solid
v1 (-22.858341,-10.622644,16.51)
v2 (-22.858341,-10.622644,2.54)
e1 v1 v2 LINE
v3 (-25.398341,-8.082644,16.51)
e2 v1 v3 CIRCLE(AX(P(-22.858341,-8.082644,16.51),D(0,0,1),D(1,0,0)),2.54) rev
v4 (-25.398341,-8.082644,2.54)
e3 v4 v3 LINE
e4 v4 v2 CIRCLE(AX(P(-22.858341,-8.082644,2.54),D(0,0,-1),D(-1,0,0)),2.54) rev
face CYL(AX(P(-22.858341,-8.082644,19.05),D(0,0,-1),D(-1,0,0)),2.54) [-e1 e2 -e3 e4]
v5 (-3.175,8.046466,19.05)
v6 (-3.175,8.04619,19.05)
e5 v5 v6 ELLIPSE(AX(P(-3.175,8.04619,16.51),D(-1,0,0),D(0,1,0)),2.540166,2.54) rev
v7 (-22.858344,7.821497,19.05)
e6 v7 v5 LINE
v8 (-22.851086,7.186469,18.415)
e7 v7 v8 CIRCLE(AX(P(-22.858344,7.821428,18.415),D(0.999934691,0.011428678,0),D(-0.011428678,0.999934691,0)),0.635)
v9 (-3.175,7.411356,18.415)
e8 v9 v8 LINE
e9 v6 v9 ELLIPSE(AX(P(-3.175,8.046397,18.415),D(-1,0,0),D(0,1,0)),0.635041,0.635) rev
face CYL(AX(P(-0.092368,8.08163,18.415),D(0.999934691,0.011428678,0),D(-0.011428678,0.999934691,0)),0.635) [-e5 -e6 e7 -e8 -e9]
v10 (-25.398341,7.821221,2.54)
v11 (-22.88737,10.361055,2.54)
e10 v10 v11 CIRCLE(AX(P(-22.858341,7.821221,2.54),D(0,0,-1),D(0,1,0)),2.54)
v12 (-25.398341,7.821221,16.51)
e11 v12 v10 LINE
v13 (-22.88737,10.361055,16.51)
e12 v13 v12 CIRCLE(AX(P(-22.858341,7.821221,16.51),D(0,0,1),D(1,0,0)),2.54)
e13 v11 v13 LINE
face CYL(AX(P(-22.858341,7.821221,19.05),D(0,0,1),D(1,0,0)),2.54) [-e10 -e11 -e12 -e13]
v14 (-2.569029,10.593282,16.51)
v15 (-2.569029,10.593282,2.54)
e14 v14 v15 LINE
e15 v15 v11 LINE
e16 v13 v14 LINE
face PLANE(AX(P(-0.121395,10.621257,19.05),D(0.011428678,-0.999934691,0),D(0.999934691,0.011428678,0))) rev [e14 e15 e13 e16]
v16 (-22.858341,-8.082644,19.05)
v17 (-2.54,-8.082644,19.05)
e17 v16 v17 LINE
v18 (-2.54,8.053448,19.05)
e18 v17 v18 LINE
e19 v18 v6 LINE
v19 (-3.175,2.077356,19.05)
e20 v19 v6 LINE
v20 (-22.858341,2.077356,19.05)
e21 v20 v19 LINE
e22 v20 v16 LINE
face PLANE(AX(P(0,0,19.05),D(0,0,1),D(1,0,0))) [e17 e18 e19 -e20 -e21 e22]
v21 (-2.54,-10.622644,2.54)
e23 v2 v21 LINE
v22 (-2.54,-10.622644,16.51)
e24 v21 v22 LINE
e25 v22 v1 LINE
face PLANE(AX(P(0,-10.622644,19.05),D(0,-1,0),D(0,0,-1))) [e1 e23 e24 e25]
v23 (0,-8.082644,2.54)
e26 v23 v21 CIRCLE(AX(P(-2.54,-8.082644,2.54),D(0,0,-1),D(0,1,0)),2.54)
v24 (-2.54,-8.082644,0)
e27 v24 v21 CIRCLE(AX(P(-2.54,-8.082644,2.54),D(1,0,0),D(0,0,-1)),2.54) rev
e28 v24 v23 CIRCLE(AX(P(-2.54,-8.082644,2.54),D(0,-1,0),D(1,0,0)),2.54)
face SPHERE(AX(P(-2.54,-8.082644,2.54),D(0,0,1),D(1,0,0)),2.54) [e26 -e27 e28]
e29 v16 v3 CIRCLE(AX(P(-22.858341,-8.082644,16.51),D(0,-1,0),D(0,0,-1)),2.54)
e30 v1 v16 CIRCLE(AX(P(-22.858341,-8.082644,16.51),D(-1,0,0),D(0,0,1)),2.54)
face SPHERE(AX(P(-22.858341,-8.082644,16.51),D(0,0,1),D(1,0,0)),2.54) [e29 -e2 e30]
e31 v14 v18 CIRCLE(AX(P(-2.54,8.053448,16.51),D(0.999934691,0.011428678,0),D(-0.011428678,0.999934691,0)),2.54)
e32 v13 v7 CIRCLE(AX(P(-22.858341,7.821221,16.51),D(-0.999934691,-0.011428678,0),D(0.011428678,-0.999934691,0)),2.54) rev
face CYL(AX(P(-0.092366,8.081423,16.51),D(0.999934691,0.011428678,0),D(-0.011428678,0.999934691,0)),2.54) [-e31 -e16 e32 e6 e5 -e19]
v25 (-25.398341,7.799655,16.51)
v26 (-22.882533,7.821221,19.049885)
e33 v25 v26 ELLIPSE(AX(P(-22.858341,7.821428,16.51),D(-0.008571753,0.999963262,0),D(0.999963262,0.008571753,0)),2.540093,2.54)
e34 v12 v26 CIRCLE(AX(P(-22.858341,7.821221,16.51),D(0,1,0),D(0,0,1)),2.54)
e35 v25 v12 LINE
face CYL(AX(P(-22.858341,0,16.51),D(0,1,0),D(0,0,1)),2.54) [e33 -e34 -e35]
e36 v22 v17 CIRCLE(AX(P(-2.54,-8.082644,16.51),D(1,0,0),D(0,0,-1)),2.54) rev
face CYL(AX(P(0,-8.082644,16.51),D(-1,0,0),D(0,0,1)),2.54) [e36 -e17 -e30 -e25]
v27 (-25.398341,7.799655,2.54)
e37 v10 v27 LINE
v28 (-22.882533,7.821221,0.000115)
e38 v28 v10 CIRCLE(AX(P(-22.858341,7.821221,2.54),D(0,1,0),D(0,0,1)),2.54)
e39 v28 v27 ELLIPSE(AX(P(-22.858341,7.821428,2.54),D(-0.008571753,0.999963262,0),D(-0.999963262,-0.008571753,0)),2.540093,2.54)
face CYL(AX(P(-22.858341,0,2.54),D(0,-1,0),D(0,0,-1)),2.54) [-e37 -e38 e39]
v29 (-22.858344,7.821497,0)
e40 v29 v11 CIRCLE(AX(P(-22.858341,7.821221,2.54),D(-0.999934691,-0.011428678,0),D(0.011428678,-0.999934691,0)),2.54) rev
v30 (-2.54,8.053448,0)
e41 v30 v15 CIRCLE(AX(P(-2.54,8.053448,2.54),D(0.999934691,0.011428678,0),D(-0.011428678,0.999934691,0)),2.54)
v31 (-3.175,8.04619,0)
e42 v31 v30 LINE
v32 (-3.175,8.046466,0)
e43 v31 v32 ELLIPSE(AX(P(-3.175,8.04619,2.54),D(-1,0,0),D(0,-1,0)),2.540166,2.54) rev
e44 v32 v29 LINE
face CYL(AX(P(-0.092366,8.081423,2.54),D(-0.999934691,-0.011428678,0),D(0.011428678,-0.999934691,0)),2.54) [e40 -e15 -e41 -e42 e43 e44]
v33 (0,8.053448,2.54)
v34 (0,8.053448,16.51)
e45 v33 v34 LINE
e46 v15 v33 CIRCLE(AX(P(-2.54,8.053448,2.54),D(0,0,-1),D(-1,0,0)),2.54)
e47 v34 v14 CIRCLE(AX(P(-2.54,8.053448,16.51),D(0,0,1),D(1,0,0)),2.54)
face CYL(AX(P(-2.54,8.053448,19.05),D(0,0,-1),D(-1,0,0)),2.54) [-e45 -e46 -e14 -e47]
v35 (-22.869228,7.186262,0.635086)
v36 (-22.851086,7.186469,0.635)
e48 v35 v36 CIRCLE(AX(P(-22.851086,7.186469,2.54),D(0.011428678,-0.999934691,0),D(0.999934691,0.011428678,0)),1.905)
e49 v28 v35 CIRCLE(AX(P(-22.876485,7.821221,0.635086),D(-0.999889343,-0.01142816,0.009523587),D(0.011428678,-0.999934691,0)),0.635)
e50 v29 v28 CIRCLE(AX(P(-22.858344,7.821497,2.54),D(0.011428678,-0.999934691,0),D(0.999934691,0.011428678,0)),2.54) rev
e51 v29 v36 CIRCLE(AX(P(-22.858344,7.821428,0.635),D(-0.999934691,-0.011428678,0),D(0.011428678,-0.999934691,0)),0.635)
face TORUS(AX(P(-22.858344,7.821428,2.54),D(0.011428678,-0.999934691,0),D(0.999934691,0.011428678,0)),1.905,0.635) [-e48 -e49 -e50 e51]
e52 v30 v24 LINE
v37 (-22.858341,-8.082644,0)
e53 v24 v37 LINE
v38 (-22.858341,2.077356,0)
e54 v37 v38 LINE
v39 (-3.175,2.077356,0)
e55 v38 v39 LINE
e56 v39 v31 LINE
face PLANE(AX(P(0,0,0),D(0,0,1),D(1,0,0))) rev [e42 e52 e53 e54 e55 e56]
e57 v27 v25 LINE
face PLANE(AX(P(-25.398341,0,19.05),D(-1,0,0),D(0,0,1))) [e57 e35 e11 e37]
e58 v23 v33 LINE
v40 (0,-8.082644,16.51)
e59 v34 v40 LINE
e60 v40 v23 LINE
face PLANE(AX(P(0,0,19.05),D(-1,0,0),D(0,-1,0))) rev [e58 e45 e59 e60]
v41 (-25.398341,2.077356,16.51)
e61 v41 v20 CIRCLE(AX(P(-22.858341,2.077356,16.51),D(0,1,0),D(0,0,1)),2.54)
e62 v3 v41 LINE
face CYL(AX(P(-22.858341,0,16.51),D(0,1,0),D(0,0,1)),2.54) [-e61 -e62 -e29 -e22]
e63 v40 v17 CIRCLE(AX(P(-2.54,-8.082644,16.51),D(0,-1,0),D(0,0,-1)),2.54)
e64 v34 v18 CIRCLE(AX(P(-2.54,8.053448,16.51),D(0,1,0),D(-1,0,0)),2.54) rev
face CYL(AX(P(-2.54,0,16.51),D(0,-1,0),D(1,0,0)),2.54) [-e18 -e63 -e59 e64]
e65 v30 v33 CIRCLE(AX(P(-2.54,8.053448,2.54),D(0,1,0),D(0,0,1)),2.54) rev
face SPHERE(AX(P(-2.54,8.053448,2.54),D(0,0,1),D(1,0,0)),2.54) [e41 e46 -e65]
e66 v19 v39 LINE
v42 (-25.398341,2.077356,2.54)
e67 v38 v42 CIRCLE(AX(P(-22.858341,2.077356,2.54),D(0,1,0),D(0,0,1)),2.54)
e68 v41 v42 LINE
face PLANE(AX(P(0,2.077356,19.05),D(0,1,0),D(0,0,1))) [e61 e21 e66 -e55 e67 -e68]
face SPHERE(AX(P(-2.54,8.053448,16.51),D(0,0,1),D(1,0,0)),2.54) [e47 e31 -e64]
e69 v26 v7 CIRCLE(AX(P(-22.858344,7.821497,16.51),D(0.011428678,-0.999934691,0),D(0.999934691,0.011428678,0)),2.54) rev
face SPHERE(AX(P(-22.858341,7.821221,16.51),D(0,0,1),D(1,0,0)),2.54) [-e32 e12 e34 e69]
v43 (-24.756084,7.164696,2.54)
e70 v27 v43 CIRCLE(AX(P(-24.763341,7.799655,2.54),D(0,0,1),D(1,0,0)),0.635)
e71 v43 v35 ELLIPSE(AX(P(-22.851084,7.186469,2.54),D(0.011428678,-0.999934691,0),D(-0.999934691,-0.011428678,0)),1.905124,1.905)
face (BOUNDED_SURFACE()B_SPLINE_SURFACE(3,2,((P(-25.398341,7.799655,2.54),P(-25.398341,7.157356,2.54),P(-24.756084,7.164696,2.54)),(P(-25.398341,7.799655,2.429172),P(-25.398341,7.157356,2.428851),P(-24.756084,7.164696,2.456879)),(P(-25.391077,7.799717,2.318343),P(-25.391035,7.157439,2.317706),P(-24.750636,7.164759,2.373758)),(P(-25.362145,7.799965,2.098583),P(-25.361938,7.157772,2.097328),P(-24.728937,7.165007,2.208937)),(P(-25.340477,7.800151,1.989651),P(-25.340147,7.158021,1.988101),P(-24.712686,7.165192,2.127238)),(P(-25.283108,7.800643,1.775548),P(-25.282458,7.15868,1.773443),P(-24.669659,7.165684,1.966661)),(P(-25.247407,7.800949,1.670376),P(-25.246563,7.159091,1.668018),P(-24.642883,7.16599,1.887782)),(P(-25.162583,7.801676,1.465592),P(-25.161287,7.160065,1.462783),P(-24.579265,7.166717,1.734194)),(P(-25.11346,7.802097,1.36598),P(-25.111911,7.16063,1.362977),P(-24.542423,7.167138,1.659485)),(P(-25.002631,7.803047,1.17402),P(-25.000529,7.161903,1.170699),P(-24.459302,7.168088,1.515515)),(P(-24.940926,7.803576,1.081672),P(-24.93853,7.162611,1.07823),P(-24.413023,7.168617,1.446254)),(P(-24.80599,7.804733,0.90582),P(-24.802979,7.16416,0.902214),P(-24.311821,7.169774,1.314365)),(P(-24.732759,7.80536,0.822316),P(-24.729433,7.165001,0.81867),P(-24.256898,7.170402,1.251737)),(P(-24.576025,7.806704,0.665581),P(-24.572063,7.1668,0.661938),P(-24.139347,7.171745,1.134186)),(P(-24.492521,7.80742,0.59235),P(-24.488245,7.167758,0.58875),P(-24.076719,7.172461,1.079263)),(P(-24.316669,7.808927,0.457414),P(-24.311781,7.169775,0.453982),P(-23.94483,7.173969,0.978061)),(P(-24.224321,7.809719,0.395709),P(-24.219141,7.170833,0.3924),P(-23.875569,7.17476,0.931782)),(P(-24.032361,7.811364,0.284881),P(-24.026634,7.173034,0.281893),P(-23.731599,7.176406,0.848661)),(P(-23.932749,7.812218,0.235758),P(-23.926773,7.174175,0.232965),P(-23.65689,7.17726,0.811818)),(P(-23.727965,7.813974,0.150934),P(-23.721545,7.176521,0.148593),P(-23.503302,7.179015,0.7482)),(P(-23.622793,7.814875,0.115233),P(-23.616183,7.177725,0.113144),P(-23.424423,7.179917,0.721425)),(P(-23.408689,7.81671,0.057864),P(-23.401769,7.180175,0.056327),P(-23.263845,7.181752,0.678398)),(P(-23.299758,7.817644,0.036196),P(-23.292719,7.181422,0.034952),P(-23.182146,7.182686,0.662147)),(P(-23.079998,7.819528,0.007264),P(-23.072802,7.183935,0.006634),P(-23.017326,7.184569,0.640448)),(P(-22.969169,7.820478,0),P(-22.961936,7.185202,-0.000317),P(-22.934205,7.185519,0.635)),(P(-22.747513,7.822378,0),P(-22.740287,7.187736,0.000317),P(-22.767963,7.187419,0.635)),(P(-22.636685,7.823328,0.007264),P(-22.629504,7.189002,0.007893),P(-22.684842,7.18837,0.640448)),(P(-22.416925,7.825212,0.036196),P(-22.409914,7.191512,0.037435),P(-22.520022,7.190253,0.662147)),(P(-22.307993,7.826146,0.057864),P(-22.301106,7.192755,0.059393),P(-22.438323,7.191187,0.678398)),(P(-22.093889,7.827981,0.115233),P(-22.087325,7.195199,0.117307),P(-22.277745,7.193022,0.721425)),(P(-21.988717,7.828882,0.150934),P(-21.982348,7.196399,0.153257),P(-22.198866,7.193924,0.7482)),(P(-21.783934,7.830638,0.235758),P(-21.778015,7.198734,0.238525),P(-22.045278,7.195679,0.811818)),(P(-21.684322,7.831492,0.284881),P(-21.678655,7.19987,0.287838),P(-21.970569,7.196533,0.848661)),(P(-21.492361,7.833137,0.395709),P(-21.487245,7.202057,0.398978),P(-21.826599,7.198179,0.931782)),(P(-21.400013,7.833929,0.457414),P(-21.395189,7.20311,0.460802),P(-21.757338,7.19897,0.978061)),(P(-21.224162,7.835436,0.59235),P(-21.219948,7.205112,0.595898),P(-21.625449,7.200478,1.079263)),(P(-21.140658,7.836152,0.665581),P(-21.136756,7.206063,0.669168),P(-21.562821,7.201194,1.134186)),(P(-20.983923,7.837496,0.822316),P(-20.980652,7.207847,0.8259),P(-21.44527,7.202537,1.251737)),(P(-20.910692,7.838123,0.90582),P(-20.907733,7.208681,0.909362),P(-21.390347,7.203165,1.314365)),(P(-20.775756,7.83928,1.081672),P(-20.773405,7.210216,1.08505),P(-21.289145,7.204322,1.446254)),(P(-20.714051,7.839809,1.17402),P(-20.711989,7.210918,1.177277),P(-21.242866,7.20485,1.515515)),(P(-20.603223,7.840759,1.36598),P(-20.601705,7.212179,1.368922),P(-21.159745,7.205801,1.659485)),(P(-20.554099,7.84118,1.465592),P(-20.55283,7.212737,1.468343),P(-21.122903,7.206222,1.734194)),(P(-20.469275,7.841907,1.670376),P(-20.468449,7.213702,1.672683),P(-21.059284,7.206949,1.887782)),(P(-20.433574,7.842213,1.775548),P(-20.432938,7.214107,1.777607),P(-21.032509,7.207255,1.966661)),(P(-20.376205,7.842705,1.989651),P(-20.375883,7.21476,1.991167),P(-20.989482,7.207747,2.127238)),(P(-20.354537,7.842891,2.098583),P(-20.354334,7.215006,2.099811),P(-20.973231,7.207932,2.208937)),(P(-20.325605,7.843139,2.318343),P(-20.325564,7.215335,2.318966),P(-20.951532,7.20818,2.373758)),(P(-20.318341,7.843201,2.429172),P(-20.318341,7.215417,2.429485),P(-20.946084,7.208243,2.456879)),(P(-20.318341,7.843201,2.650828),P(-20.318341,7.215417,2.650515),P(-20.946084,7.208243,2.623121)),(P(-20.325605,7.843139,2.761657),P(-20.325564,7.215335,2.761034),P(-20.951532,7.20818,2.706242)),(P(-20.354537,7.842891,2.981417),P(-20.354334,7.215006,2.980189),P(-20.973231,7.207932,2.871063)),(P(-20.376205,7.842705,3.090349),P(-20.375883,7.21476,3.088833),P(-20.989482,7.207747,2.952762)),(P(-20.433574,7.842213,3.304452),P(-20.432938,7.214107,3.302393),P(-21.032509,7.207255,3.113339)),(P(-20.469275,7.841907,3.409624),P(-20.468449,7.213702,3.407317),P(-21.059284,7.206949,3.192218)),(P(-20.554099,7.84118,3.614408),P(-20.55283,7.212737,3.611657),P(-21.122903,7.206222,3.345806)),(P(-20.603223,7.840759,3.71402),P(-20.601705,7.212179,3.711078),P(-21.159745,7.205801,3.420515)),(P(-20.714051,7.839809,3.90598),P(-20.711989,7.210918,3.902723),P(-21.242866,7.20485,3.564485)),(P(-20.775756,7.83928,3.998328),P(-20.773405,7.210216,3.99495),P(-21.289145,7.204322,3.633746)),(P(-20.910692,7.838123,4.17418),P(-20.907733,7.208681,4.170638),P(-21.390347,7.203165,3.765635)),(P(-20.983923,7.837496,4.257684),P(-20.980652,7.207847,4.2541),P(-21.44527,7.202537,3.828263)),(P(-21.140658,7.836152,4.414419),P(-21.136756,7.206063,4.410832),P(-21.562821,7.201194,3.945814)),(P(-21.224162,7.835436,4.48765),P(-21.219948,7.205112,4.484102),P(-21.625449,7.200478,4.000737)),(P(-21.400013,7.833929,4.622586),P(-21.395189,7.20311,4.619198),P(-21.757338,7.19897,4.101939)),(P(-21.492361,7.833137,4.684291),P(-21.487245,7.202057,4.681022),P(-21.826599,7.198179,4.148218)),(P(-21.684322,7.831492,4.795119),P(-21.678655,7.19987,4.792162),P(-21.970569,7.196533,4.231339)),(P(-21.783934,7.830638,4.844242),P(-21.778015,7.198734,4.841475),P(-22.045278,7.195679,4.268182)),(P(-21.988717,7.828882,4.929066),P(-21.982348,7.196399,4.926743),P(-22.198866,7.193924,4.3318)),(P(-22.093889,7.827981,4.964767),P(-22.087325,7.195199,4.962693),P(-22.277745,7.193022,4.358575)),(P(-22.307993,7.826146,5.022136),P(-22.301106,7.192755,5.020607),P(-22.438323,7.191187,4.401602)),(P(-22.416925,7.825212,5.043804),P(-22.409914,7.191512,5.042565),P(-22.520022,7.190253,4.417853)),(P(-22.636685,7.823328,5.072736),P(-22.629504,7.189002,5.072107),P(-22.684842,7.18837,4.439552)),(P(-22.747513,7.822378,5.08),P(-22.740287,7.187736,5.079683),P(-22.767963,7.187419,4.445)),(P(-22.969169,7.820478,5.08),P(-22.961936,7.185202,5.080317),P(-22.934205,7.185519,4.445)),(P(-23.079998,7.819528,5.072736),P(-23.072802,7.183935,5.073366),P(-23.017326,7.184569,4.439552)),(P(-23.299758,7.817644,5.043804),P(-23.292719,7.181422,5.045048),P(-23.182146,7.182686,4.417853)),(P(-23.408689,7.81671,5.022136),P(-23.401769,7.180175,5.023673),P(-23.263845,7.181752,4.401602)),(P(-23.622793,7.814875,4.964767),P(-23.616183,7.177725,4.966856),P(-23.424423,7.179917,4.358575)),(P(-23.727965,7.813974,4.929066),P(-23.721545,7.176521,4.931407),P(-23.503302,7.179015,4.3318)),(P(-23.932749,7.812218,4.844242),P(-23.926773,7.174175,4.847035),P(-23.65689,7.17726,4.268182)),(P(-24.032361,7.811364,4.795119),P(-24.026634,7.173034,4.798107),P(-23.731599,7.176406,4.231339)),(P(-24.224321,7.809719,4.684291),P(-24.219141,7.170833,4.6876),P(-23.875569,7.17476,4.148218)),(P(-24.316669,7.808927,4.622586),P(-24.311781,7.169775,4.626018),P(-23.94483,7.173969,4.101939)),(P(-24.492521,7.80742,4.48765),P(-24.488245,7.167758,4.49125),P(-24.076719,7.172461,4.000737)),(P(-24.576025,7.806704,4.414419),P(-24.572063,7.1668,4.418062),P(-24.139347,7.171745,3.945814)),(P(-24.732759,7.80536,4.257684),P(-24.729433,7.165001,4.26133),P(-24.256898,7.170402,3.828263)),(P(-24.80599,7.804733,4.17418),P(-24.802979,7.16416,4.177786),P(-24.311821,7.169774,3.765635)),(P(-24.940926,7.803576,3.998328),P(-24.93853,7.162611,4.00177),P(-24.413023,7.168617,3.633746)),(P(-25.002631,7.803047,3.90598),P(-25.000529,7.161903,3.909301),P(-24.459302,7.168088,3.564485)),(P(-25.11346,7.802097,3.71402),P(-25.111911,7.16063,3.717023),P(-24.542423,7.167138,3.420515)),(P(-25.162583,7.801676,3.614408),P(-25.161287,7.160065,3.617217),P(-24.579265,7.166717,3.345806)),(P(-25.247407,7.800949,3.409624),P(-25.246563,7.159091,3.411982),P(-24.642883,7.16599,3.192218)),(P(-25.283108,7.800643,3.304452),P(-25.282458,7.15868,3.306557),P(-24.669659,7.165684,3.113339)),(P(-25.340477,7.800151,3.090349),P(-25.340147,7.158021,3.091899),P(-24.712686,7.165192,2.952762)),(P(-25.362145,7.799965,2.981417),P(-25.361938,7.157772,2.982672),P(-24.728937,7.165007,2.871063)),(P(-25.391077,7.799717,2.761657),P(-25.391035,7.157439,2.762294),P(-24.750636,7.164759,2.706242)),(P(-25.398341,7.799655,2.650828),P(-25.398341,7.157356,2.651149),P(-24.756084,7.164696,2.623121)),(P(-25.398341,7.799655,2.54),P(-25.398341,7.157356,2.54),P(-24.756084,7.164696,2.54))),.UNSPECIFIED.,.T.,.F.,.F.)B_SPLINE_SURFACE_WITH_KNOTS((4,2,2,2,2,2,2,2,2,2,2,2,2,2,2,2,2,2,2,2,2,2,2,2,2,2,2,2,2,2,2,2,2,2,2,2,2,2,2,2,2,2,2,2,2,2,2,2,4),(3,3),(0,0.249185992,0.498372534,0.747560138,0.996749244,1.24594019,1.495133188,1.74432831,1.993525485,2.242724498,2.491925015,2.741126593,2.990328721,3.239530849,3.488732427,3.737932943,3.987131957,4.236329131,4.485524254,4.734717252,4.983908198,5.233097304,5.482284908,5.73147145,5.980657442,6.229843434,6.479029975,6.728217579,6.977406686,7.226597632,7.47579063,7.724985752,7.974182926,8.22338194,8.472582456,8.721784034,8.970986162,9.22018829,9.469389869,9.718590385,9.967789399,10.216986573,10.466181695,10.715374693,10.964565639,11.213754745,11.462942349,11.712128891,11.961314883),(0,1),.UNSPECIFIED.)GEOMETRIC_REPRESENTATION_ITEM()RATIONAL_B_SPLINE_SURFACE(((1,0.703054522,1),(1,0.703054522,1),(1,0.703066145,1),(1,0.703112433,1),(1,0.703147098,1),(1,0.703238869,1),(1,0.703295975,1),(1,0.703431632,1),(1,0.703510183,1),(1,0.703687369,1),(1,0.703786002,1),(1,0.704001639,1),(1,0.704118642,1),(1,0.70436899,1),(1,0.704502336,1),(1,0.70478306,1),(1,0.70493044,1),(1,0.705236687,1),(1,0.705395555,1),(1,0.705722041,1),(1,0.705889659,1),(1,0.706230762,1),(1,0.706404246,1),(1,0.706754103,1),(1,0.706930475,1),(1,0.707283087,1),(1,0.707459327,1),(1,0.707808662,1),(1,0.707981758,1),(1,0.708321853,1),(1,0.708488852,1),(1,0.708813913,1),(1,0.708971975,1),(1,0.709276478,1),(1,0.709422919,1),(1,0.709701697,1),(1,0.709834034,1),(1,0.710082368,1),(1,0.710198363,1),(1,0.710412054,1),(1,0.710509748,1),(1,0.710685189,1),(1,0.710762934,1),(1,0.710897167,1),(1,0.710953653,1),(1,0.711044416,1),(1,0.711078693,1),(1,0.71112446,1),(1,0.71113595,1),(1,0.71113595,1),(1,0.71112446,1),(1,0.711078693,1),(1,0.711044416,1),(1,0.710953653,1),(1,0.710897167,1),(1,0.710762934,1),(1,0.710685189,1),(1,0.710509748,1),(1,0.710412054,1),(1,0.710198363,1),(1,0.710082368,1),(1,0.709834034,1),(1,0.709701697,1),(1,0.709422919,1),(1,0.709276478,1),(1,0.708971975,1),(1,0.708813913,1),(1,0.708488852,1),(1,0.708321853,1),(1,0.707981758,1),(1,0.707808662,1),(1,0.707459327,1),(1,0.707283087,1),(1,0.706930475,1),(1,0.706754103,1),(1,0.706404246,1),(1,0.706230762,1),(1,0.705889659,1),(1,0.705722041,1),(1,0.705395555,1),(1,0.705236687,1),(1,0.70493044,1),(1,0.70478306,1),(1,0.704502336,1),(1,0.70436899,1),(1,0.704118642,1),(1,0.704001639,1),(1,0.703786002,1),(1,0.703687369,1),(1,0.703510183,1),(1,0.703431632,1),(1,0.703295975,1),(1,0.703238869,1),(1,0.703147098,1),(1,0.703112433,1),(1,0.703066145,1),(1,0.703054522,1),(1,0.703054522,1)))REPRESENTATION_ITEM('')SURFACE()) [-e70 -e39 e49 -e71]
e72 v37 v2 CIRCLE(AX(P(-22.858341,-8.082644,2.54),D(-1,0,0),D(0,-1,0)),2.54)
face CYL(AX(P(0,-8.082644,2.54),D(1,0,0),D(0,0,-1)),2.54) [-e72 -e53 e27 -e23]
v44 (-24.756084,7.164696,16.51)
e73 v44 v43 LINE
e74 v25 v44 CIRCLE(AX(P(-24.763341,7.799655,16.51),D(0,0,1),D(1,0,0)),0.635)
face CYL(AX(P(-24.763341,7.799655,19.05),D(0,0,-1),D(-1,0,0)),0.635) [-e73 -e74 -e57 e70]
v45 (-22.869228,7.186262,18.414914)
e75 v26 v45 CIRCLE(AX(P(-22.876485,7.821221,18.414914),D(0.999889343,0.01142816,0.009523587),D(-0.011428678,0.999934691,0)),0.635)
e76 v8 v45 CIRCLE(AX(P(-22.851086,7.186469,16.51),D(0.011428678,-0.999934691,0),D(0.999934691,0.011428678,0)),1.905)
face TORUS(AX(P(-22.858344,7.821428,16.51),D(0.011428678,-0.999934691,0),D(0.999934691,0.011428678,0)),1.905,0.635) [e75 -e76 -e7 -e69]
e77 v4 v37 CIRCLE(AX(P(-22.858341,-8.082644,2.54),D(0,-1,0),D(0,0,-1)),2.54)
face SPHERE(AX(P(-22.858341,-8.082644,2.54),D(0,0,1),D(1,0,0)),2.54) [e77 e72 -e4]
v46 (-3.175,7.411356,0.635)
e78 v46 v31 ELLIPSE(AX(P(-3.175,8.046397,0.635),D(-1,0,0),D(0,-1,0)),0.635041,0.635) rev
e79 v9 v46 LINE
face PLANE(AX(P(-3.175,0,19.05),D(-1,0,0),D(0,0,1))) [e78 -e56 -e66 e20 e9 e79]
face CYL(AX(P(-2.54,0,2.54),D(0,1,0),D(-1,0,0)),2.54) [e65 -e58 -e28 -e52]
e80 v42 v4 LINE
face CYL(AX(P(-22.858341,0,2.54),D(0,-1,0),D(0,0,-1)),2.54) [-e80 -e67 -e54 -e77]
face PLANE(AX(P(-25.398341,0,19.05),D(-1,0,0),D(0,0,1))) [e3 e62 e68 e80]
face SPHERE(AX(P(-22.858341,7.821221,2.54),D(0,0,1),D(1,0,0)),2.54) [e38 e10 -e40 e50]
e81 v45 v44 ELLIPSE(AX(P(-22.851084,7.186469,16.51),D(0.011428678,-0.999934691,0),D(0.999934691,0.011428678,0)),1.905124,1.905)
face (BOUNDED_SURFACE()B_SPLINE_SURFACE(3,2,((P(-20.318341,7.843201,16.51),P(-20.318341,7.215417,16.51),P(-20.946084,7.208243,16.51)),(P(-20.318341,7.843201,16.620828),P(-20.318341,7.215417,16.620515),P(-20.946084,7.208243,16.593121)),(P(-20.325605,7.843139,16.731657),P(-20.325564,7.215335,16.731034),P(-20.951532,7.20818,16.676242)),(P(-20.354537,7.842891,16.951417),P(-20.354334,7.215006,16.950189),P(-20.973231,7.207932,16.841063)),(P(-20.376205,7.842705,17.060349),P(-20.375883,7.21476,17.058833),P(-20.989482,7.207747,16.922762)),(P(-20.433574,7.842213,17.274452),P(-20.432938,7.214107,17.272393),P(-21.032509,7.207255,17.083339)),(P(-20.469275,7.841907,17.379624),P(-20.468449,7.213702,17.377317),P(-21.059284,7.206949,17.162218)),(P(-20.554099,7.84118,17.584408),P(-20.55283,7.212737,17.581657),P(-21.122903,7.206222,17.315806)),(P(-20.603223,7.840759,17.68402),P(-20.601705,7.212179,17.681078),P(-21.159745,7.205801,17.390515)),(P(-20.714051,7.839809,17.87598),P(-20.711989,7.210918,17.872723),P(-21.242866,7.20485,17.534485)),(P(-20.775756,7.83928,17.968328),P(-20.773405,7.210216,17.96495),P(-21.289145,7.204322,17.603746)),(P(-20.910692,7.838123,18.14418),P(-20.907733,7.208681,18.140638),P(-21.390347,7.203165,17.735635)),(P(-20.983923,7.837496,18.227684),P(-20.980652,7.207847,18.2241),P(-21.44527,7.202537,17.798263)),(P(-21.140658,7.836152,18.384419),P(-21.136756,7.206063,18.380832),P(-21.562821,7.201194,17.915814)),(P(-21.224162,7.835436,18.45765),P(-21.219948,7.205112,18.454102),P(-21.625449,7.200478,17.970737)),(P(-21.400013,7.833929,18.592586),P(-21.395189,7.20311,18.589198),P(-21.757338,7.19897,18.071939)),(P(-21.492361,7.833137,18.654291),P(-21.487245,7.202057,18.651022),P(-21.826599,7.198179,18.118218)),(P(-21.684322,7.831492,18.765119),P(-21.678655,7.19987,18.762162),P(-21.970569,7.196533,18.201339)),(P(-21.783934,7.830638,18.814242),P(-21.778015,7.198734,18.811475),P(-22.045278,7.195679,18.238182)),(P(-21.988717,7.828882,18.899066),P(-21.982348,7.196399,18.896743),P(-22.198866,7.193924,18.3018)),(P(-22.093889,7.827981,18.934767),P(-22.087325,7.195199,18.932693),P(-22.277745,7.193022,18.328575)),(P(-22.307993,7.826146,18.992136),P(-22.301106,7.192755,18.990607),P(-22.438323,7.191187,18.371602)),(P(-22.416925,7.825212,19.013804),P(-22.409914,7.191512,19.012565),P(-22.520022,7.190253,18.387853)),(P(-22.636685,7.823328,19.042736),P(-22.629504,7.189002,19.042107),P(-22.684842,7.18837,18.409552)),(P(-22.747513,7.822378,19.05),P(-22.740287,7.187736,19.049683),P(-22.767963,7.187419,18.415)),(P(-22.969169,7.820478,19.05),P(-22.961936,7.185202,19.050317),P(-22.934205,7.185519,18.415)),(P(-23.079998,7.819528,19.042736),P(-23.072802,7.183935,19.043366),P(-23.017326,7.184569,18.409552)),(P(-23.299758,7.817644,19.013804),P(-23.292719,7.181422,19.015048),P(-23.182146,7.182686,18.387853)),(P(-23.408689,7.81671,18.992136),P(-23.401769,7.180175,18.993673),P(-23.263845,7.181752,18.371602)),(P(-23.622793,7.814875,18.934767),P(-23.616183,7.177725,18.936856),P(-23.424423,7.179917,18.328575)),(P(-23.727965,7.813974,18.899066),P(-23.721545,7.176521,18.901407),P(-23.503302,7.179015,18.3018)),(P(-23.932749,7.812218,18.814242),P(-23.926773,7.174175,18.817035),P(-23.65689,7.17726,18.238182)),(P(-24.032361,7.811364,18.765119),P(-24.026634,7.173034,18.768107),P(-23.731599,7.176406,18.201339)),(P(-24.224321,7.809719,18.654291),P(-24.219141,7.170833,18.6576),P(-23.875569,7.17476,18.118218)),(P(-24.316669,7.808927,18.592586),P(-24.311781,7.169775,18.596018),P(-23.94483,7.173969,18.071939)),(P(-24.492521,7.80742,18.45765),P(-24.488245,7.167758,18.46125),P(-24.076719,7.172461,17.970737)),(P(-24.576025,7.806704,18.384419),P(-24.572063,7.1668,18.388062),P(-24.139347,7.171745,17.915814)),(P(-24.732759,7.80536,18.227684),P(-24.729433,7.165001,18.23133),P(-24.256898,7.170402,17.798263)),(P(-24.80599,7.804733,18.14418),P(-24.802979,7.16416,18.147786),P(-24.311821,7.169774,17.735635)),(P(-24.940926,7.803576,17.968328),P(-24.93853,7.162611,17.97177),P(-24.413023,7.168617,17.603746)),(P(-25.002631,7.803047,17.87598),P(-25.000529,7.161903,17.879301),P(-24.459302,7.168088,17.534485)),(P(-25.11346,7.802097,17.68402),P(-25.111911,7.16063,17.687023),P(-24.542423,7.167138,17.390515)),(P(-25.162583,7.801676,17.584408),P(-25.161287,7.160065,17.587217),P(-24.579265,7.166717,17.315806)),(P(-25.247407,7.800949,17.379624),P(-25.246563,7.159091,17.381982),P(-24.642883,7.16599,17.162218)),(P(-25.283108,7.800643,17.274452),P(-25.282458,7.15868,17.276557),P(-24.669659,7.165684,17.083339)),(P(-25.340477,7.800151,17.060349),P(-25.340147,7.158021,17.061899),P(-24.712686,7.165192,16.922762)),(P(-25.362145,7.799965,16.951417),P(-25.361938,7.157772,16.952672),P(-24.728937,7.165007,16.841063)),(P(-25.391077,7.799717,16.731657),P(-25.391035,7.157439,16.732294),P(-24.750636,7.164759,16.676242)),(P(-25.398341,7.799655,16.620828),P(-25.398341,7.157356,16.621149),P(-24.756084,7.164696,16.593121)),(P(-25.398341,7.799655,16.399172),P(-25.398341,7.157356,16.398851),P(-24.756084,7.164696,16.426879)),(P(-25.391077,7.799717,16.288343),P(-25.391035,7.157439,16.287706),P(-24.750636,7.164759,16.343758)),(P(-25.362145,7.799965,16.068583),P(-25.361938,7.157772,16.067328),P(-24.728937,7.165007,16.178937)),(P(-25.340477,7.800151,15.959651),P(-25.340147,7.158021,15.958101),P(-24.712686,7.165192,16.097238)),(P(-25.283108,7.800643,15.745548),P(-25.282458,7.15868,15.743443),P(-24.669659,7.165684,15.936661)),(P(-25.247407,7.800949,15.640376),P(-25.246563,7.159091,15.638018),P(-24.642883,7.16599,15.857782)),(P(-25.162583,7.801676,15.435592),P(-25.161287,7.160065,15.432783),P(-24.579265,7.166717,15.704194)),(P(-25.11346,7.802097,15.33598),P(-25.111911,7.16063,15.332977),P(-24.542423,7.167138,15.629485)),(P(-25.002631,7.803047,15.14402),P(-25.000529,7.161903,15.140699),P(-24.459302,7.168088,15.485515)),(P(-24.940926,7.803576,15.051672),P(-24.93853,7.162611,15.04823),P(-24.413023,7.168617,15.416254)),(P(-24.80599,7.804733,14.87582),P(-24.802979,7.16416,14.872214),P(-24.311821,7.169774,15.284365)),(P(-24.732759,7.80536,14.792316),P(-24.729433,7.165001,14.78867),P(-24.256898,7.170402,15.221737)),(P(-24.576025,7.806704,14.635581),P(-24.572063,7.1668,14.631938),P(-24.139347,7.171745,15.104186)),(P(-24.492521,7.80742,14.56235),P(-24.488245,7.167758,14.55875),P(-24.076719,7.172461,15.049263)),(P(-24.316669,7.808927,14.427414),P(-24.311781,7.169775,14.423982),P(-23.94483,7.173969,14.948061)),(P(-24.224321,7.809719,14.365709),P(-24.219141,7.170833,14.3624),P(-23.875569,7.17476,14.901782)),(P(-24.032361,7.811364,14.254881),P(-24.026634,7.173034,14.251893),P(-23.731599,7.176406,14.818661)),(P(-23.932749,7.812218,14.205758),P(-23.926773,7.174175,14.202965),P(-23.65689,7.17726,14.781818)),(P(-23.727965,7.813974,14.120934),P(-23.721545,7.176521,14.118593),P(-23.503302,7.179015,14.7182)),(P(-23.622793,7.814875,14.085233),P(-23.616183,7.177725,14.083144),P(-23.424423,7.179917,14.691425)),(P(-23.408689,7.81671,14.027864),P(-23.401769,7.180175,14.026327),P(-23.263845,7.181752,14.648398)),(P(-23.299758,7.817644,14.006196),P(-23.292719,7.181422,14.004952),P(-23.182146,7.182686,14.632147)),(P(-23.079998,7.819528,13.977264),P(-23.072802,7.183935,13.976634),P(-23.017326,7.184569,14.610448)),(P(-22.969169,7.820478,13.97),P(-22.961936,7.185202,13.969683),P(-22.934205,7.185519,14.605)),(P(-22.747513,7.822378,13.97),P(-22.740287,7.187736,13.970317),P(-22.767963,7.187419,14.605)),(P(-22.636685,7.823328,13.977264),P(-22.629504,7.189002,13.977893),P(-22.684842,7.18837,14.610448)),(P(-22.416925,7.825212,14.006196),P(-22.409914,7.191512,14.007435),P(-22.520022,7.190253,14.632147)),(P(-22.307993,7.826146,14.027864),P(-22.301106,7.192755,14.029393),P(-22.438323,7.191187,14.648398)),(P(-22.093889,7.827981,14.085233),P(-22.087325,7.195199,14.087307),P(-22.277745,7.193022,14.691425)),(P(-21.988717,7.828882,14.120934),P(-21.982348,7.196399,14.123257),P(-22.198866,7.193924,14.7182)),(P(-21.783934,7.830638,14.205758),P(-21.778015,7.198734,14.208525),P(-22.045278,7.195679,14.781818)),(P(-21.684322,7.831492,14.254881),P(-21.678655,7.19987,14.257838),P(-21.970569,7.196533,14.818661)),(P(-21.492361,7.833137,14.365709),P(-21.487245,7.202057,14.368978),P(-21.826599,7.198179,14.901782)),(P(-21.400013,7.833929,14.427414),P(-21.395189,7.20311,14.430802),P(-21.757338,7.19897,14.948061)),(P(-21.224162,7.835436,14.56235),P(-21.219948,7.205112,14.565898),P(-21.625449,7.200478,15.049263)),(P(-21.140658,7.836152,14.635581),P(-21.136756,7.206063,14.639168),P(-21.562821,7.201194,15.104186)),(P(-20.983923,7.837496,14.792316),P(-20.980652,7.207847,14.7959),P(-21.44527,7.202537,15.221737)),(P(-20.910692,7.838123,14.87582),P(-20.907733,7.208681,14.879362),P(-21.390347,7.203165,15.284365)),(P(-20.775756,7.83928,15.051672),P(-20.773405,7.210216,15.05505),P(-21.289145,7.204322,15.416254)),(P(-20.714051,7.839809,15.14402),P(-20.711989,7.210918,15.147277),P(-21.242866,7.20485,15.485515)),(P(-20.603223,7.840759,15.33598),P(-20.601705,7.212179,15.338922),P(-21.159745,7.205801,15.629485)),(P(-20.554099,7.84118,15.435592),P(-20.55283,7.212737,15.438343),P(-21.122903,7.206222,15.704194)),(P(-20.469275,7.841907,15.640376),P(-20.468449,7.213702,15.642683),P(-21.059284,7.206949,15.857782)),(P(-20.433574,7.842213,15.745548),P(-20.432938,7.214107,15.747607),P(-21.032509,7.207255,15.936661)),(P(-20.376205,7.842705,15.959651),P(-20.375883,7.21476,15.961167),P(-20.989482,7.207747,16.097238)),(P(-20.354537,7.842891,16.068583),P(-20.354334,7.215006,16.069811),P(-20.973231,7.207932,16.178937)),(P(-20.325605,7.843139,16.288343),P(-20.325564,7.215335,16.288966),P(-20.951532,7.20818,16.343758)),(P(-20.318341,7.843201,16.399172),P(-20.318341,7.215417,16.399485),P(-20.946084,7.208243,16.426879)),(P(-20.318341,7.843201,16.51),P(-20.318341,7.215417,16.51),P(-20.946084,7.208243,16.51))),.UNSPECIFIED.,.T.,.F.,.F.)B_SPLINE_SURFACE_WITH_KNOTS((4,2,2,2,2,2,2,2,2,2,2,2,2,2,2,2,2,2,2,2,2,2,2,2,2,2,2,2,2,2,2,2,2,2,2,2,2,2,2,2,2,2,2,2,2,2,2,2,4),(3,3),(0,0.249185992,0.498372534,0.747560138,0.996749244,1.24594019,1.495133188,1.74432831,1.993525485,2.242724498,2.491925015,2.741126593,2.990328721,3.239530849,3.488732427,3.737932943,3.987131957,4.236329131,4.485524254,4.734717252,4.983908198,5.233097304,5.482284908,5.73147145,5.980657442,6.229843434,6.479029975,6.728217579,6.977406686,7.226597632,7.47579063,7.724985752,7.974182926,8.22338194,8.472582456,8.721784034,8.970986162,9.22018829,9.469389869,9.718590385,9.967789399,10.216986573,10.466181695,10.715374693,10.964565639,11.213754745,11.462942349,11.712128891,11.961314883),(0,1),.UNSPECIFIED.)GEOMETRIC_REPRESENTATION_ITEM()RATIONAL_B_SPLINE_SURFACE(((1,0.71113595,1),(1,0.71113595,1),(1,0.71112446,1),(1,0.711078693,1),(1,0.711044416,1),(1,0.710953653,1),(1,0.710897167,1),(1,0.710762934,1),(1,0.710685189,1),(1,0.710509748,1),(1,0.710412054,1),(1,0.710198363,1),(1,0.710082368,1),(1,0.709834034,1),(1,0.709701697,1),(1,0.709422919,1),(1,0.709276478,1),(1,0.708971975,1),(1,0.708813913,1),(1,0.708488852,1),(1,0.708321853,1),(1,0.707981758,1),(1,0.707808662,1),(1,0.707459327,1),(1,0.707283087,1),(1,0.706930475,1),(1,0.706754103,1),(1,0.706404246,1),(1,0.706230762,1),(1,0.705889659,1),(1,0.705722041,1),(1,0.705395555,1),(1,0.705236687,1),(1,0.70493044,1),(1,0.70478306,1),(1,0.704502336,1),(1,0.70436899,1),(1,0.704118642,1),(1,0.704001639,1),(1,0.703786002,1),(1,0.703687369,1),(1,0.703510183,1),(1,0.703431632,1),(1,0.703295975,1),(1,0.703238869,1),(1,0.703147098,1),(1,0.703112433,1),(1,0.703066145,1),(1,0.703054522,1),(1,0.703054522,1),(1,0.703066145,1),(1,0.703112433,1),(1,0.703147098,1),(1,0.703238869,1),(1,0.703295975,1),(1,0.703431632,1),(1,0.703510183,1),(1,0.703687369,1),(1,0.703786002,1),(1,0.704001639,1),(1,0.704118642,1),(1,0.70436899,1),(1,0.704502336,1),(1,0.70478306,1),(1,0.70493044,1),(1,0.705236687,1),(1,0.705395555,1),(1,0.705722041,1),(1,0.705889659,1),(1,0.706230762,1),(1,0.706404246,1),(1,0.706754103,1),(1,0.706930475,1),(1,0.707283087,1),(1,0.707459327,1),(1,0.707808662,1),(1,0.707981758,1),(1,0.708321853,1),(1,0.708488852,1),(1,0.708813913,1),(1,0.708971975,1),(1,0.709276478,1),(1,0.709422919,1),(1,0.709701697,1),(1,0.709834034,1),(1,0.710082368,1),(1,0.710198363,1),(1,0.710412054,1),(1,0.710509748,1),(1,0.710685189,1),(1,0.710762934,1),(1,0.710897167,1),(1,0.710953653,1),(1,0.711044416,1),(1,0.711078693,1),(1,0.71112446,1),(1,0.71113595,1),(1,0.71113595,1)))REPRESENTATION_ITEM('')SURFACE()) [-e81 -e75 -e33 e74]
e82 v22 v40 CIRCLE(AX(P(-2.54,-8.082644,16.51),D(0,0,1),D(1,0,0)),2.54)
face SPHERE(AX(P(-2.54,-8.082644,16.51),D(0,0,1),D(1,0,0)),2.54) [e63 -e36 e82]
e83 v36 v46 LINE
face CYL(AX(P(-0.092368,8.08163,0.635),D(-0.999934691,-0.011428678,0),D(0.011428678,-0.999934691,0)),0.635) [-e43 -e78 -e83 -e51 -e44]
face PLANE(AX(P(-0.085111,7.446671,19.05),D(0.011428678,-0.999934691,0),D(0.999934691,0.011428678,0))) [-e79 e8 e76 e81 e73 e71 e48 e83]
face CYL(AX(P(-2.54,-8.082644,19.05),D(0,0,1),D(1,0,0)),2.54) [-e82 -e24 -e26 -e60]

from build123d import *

# Parameters (mm, degrees)
BOSS_EXTRUDE1_DEPTH = 19.05
FILLET1_R           = 2.54
FILLET2_R           = 0.635


with BuildPart() as part:
    # Sketch1 → Boss-Extrude1 (new body)
    with BuildSketch(Plane.XY):
        Polygon((-25.398341139, -10.622644211), (0, -10.622644211), (0, 10.622644211), (-25.398341139, 10.332355789), (-25.398341139, 7.157355789), (-3.175, 7.411355789), (-3.175, 7.157355789), (-3.175, 2.077355789), (-25.398341139, 2.077355789), align=None)
    extrude(amount=BOSS_EXTRUDE1_DEPTH)

    # Fillet1
    fillet1_edges = [part.edges().sort_by_distance(p)[0] for p in [
        (-12.69917057, 10.4775, 0),
        (0, 0, 0),
        (-12.69917057, -10.622644211, 0),
        (-25.398341139, -4.272644211, 0),
        (-25.398341139, 10.332355789, 9.525),
        (0, 10.622644211, 9.525),
        (0, -10.622644211, 9.525),
        (-25.398341139, -10.622644211, 9.525),
        (-25.398341139, -4.272644211, 19.05),
        (-12.69917057, -10.622644211, 19.05),
        (0, 0, 19.05),
        (-12.69917057, 10.4775, 19.05),
        (-25.398341139, 8.744855789, 19.05),
        (-25.398341139, 8.744855789, 0),
    ]]
    fillet(fillet1_edges, radius=FILLET1_R)

    # Fillet2
    fillet2_edges = [part.edges().sort_by_distance(p)[0] for p in [
        (-13.01667057, 7.298871158, 0),
        (-25.398341139, 7.157355789, 9.525),
        (-24.654392364, 7.165858695, 18.306051224),
        (-24.654392364, 7.165858695, 0.743948776),
        (-13.01667057, 7.298871158, 19.05),
    ]]
    fillet(fillet2_edges, radius=FILLET2_R - 0.0004)  # a hair under: the kernel refuses the full size


solid = part.part
